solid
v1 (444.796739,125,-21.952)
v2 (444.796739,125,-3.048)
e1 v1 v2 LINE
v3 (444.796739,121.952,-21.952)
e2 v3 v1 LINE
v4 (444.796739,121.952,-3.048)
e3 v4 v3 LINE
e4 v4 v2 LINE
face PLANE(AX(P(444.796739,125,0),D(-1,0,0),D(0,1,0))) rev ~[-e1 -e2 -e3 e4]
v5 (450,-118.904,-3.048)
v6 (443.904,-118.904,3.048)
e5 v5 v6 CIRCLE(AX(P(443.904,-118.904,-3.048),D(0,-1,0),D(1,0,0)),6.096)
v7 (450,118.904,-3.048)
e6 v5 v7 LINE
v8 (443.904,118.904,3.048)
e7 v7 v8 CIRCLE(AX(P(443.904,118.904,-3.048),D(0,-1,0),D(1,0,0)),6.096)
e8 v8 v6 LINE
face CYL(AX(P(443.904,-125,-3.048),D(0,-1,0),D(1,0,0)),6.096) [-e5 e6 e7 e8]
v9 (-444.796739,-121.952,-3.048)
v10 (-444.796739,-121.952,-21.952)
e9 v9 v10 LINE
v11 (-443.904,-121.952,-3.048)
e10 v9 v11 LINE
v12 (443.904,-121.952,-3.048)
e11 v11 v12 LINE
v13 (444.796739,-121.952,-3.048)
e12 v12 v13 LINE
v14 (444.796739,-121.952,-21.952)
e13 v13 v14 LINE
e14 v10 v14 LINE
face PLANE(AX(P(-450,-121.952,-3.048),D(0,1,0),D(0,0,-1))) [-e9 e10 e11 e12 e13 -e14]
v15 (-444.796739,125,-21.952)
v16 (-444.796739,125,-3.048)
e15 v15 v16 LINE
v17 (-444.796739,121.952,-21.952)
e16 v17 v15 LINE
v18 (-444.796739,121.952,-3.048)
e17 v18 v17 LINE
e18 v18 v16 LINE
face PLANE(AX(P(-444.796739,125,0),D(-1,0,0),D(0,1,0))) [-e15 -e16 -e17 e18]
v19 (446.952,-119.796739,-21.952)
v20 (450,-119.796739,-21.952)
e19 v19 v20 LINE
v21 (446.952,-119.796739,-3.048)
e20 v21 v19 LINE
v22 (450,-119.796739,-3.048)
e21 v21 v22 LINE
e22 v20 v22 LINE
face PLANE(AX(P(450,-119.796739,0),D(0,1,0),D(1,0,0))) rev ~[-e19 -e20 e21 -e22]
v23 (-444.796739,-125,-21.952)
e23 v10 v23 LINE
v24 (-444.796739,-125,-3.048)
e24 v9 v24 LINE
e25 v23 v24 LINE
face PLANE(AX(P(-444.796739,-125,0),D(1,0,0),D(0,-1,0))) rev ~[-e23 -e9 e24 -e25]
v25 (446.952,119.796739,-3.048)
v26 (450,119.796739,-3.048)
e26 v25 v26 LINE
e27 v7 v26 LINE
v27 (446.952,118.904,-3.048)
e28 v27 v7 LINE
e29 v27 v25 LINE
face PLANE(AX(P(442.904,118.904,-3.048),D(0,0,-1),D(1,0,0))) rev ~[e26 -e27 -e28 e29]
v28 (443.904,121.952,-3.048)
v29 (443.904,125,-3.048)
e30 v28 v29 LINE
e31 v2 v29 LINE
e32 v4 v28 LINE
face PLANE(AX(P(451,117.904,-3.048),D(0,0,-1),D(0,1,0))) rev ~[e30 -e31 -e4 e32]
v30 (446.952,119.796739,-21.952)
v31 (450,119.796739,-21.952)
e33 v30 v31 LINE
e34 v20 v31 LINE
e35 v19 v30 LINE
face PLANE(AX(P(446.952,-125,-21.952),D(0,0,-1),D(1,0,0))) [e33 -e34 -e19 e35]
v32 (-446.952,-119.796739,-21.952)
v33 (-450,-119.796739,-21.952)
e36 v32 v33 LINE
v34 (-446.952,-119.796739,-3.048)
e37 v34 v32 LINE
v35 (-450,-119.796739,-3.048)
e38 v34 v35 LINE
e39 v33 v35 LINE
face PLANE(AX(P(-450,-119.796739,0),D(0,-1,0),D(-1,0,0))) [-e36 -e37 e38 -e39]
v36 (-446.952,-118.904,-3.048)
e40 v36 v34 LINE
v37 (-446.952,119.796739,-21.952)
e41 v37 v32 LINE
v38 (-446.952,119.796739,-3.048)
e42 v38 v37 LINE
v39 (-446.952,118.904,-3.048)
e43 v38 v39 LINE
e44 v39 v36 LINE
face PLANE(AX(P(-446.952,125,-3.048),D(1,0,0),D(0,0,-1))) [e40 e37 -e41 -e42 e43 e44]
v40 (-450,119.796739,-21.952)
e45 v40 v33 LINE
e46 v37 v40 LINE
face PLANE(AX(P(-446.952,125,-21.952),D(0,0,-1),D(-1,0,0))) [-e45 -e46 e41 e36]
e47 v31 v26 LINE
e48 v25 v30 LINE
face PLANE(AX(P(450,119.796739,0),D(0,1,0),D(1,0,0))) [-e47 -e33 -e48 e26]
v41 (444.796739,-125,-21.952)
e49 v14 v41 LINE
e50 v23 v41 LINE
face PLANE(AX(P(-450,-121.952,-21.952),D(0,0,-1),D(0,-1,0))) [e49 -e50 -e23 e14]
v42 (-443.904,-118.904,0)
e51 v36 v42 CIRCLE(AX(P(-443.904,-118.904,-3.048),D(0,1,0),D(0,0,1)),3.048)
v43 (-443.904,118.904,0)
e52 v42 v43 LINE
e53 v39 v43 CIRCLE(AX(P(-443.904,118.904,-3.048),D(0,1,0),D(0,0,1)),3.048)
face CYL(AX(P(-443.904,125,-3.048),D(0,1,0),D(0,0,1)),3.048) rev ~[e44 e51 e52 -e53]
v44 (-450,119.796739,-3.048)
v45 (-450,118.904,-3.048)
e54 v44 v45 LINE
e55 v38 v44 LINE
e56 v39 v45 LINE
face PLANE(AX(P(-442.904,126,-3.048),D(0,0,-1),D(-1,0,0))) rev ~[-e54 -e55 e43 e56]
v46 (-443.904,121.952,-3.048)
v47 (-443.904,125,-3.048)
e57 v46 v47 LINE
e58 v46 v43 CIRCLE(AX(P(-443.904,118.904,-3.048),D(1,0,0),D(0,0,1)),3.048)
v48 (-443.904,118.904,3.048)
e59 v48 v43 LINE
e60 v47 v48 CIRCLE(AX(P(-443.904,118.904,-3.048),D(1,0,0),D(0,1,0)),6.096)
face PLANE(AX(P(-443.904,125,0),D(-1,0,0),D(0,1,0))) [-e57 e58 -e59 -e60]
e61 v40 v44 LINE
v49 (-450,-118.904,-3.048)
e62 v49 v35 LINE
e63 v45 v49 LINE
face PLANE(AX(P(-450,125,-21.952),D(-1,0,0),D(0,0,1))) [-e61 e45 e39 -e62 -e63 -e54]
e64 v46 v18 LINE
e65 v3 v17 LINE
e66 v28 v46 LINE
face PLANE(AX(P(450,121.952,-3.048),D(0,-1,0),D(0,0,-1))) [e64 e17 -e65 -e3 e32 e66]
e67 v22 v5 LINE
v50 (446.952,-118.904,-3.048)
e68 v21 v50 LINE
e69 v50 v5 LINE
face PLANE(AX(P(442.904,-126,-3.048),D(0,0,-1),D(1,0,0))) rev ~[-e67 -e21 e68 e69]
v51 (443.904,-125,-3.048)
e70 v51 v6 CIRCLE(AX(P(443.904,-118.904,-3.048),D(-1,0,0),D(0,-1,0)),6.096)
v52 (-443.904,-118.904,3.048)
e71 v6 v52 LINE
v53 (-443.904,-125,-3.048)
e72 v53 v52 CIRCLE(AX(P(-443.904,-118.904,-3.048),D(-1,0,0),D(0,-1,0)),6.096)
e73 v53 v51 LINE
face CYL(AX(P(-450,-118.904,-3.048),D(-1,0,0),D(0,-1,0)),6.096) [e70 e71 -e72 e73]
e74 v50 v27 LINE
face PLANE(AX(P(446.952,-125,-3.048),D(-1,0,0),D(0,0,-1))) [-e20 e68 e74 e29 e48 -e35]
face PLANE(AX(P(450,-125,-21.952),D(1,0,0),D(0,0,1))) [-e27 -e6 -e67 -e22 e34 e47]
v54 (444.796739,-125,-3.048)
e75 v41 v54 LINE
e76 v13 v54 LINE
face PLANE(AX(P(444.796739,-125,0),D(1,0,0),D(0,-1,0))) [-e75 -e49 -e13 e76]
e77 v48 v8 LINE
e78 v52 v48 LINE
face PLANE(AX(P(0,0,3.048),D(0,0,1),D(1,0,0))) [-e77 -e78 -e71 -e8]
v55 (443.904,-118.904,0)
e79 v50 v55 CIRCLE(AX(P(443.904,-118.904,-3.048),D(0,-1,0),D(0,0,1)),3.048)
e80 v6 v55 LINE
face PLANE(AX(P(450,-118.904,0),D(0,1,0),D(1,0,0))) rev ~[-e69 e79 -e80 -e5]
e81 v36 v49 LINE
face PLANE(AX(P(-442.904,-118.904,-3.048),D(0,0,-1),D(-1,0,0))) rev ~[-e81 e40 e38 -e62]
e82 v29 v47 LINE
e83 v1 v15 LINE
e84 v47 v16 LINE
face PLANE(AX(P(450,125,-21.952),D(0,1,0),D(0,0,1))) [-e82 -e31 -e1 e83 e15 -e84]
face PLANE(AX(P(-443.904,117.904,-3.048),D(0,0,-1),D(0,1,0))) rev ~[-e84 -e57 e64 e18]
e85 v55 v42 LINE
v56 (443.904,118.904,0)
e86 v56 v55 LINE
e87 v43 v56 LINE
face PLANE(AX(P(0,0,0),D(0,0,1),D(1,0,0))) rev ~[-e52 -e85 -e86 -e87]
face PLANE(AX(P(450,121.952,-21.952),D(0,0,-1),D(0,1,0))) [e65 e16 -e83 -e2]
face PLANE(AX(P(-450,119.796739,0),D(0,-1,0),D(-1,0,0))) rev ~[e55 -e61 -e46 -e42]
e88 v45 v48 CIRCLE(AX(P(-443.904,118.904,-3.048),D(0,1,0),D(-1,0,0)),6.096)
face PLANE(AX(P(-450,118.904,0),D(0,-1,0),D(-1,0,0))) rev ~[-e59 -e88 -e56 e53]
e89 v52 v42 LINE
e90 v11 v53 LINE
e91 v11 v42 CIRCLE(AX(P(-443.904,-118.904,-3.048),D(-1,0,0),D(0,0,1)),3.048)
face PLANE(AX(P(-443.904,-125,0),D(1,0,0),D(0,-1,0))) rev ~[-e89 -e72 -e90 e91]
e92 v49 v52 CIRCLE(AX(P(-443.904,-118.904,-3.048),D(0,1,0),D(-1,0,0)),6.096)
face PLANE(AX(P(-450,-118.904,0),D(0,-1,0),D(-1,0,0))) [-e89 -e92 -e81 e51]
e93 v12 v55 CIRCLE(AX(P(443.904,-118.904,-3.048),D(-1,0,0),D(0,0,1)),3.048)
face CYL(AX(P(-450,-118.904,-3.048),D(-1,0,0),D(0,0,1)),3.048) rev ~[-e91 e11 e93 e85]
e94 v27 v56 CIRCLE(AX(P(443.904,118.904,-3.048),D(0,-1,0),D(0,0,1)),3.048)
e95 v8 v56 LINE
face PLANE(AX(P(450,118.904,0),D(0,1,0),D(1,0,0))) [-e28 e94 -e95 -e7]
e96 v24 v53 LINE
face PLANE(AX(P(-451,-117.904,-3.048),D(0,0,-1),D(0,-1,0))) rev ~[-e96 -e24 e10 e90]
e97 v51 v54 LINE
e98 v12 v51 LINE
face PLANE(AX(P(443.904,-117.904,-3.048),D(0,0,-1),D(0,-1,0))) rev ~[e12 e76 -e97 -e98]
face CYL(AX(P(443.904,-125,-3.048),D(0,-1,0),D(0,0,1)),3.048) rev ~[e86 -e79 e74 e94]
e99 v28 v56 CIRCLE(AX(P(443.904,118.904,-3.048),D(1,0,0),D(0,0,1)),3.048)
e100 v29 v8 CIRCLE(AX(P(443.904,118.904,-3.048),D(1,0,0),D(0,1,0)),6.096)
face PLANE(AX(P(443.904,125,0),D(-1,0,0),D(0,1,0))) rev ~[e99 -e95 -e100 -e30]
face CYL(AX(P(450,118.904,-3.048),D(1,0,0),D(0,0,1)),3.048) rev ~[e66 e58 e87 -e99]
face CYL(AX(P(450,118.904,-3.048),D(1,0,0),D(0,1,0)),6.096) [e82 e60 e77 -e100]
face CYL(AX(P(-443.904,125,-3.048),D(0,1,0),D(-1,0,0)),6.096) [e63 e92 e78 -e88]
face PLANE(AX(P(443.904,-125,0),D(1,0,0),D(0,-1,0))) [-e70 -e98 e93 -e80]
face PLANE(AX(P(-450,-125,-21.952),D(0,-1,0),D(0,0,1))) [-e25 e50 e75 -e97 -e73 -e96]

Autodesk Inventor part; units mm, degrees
ref_plane "YZ Plane" through (0, 0, 0) normal (1, 0, 0) x (0, 1, 0)
ref_plane "XZ Plane" through (0, 0, 0) normal (0, 1, 0) x (-1, 0, 0)
ref_plane "XY Plane" through (0, 0, 0) normal (0, 0, 1) x (1, 0, 0)
sketch "Sketch1" plane through (0, 0, 0) normal (0, 0, 1) x (1, 0, 0)
  point P0 (0, 0)
sketch "Sketch2" plane through (0, 0, 0) normal (0, 0, 1) x (1, 0, 0)
  line L0 (-450, -125) -> (450, -125)
  line L1 (450, -125) -> (450, 125)
  line L2 (450, 125) -> (-450, 125)
  line L3 (-450, 125) -> (-450, -125)
  line L4 (-450, -125) -> (450, 125) construction
  line L5 (450, -125) -> (-450, 125) construction
  point P0 (0, 0)
  dimension "d0" = 900
  dimension "d1" = 250
extrude "Plate1" add sketch "Sketch2" along normal blind 3.048
sketch "Sketch3" plane through (450, 121.952, 3.048) normal (0, 1, 0) x (-1, 0, 0)
  line L0 (900, 0) -> (0, 0)
  line L1 (0, 0) -> (0, -25)
  line L2 (0, -25) -> (900, -25)
  line L3 (900, -25) -> (900, 0)
edge flange "Flange1" height 25 angle 90 thickness 3.048 bend radius 3.048 thickness toward (0, 1, 0) relief tear relief width 3.048 relief depth 1.524 corner gap 3.048 corner form 2 edges at (0, 125, 0) (0, -125, 0) (-450, 0, 0) (450, 0, 0) wall of the first edge with corners at (-450, 121.952, 3.048) (450, 121.952, 3.048) (450, 121.952, -21.952) (-450, 121.952, -21.952)
bend "Bend1"
corner "Corner1"
equation "\"d2\" = Thickness"
equation "\"d3\" = BendReliefWidth"
equation "\"d4\" = BendReliefDepth"
equation "\"d5\" = MinimumRemnant"
equation "\"d6\" = TransitionRadius"
equation "\"d9\" = BendRadius"
equation "\"d10\" = CornerReliefSize"
equation "\"d11\" = GapSize"
equation "\"d12\" = JacobiRadiusSize"
equation "\"BendRadius\" = Thickness"
equation "\"BendReliefWidth\" = Thickness"
equation "\"BendReliefDepth\" = 0.5 * Thickness"
equation "\"CornerReliefSize\" = 4 * Thickness"
equation "\"MinimumRemnant\" = 2 * Thickness"
equation "\"TransitionRadius\" = BendRadius"
equation "\"JacobiRadiusSize\" = BendRadius"
equation "\"GapSize\" = Thickness"
equation "\"Space5\" = 0"
equation "\"Space6\" = 0"
equation "\"Space7\" = 0"
equation "\"Thickness\" = 3.048"
properties part number "TapaUp"
